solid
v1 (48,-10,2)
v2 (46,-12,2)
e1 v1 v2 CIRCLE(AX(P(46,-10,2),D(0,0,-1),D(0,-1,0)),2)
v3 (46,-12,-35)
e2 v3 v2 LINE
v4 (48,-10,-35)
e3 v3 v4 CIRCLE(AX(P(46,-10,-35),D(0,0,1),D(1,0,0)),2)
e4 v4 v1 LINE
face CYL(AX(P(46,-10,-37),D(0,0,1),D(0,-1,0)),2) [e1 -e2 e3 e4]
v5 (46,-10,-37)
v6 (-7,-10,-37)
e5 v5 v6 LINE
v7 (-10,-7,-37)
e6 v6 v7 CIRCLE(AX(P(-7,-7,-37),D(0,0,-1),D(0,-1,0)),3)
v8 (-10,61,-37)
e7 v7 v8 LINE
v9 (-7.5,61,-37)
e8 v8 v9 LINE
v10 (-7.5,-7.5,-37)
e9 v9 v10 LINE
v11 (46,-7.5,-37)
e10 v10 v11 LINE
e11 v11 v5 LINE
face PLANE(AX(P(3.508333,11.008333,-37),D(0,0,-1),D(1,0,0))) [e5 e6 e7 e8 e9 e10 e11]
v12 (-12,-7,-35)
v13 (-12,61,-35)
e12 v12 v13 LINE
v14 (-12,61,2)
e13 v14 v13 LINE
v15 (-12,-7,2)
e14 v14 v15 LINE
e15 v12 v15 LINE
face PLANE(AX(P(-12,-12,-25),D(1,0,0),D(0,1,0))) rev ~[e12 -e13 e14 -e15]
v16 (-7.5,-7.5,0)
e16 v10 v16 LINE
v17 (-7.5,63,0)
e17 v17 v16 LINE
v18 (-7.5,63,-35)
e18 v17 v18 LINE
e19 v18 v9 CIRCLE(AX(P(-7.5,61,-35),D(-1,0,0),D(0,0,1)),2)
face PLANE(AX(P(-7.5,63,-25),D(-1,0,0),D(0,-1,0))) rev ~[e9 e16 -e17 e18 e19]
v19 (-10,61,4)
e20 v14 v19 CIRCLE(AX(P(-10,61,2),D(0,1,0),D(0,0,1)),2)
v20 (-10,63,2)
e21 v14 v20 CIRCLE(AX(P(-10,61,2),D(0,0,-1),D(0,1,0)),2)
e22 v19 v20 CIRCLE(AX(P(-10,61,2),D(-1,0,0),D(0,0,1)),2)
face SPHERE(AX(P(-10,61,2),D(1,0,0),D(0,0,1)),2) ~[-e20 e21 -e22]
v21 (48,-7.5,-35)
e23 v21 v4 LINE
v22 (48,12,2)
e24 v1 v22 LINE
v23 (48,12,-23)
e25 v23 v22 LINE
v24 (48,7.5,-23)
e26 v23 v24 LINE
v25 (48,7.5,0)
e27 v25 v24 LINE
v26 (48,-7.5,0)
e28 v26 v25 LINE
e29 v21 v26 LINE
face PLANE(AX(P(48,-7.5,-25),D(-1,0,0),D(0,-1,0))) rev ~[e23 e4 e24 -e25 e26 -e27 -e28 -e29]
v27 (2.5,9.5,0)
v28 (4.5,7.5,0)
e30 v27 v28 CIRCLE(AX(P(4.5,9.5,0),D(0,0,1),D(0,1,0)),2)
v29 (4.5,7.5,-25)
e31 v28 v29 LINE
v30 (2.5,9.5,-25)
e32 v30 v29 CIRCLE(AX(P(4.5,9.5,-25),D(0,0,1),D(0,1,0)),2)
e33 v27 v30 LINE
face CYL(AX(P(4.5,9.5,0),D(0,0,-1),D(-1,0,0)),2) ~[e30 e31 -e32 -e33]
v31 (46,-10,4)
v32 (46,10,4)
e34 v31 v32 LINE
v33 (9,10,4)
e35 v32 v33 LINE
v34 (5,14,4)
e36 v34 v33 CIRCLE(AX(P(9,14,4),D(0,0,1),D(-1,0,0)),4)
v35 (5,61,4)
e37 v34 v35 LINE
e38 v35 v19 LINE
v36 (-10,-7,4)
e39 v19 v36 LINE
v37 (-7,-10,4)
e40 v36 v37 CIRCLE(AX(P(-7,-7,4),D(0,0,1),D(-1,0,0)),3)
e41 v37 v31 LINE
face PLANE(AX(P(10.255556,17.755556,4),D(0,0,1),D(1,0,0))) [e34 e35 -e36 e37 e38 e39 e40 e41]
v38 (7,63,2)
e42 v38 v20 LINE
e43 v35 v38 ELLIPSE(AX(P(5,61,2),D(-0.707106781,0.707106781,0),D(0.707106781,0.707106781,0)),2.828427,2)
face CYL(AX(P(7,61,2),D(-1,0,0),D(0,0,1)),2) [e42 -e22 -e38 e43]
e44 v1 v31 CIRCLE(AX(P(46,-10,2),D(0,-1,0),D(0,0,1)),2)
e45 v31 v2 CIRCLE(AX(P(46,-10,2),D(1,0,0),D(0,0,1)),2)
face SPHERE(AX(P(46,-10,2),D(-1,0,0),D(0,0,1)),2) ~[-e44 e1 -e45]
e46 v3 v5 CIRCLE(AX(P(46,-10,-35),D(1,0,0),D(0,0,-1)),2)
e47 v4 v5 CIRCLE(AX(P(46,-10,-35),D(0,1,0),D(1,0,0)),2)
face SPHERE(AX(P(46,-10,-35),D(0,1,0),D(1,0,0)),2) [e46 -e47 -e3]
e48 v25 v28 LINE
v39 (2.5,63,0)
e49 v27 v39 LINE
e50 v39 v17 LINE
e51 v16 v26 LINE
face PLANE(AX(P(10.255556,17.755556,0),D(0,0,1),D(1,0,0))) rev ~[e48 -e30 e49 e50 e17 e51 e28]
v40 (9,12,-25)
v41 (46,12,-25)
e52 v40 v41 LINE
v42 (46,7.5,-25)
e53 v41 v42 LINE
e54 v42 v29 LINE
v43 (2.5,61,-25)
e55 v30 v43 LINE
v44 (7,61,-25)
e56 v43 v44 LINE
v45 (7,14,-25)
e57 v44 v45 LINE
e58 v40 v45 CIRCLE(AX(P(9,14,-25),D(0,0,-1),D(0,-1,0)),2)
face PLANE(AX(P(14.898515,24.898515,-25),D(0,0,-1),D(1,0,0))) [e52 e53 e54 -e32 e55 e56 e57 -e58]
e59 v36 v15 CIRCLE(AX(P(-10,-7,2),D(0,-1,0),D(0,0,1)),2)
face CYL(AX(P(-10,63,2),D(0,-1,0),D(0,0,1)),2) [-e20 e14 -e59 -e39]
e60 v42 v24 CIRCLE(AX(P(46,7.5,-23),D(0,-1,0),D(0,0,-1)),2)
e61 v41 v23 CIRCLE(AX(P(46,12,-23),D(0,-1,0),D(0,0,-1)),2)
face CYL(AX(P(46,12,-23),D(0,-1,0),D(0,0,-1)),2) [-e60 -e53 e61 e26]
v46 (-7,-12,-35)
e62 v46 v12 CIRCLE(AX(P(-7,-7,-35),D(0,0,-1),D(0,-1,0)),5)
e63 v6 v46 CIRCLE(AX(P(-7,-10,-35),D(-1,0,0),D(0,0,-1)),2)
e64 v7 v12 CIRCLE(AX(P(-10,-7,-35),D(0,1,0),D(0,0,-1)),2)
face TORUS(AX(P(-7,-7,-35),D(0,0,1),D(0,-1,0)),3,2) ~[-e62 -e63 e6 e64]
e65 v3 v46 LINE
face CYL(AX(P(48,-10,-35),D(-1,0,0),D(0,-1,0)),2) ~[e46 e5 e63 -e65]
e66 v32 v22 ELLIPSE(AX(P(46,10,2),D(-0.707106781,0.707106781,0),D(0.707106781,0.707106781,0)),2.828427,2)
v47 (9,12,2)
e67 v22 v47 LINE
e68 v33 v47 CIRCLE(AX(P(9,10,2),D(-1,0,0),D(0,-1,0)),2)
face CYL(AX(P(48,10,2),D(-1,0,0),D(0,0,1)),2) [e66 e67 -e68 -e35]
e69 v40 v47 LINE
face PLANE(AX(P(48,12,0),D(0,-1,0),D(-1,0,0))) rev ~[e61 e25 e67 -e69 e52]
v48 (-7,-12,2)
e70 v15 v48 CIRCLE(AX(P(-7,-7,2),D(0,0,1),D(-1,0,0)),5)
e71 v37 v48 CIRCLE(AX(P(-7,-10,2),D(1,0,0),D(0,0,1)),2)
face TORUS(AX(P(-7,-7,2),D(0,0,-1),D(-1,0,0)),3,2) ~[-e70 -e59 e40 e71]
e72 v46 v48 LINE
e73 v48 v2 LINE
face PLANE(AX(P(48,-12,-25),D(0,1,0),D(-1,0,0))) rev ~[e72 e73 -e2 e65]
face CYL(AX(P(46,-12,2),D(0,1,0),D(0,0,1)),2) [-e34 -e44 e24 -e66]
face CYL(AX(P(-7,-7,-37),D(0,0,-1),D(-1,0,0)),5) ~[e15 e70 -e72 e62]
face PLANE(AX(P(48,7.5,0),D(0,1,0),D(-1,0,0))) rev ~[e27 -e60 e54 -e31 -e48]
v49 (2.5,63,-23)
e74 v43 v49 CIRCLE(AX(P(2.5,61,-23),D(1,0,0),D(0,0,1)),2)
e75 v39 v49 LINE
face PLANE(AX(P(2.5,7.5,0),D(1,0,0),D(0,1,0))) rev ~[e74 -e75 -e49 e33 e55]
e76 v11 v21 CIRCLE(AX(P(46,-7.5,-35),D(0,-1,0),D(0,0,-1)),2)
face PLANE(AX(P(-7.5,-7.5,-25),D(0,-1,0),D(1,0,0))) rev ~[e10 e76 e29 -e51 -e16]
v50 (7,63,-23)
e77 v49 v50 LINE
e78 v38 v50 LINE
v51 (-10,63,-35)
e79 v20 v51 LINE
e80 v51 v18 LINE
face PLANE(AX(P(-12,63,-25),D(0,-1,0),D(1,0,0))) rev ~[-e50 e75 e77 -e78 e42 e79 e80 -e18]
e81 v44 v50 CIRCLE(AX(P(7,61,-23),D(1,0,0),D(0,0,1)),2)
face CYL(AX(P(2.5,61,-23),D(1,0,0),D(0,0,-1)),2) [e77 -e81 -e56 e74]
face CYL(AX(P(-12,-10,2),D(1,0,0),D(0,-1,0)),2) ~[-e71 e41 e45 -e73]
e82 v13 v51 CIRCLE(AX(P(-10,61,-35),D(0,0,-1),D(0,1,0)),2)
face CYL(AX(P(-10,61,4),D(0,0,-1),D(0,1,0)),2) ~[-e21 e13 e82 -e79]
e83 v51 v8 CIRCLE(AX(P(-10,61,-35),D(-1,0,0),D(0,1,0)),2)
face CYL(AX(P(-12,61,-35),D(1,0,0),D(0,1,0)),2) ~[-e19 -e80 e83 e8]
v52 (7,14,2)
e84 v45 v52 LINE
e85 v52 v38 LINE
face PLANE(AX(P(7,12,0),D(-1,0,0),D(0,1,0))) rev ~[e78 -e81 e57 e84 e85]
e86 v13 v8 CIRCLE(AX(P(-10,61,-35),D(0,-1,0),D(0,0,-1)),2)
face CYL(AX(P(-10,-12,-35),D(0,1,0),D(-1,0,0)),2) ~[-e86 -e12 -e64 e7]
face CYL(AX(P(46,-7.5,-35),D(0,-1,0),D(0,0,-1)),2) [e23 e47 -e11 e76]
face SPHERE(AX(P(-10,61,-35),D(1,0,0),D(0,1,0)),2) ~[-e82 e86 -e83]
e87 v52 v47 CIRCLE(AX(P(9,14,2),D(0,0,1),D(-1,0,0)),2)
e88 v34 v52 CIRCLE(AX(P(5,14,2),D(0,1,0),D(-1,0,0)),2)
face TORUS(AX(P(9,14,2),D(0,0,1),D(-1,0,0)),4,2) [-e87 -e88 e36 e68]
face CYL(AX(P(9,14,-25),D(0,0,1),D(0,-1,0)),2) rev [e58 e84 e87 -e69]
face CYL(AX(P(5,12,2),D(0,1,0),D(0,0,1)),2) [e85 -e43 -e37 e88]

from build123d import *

# Parameters (mm, degrees)
F1_DEPTH    = 4
F3_DEPTH    = 25
F5_DEPTH    = 12
F6_R        = 2
F7_T1_DEPTH = 41
F7_T4_ANGLE = 90
F7_T6_ANGLE = 90


# Not quite as in the source:
# - a fillet or chamfer that OpenCascade refuses, or shapes differently, is made with other operations: its cross-section is extruded or revolved along the edge and cut away or added


with BuildPart() as f1:
    # F0 (on Top) → F1 (new body)
    with BuildSketch(Plane.XY):
        Polygon((7, 12), (7, 63), (-12, 63), (-12, -12), (48, -12), (48, 12), align=None)
    extrude(amount=F1_DEPTH)

    # F2 (on face) → F3 (join)
    with BuildSketch(Plane(origin=(0, 0, 0), x_dir=(1, 0, 0), z_dir=(0, 0, -1))):
        Polygon((48, 12), (-12, 12), (-12, -63), (-7.5, -63), (-7.5, 7.5), (48, 7.5), align=None)
        Polygon((2.5, -63), (7, -63), (7, -12), (48, -12), (48, -7.5), (2.5, -7.5), align=None)
    extrude(amount=F3_DEPTH)

    # F4 (on face) → F5 (join)
    with BuildSketch(Plane(origin=(0, 0, -25), x_dir=(1, 0, 0), z_dir=(0, 0, -1))):
        Polygon((48, 12), (-12, 12), (-12, -63), (-7.5, -63), (-7.5, 7.5), (48, 7.5), align=None)
    extrude(amount=F5_DEPTH)

    # F6
    f6_edges = [f1.edges().sort_by_distance(p)[0] for p in [
        (7, 37.5, 4),
        (-2.5, 63, 4),
        (-12, 25.5, 4),
        (18, -12, 4),
        (48, 0, 4),
        (27.5, 12, 4),
        (-9.75, 63, -37),
        (4.75, 63, -25),
        (48, -9.75, -37),
        (48, 9.75, -25),
        (2.5, 7.5, -12.5),
        (7, 12, -10.5),
        (-12, 63, -16.5),
        (48, -12, -16.5),
        (-12, 25.5, -37),
        (18, -12, -37),
    ]]
    fillet(f6_edges, radius=F6_R)

    # F7: fillet of radius 5 on 1 edges, made by hand

    # F7_s2 → F7_t1 (cut)
    with BuildSketch(Plane.XY.offset(-37)):
        with BuildLine():
            ThreePointArc((-12, -7), (-10.5355339059, -10.5355339059), (-7, -12))
            Line((-7, -12), (-12, -12))
            Line((-12, -12), (-12, -7))
        make_face()
    extrude(amount=F7_T1_DEPTH, mode=Mode.SUBTRACT)

    # F7_s3 → F7_t4 (revolve, cut)
    with BuildSketch(Plane.YZ.offset(-7)):
        with BuildLine():
            ThreePointArc((-10, -37), (-11.4142135624, -36.4142135624), (-12, -35))
            Line((-12, -35), (-12, -37))
            Line((-12, -37), (-10, -37))
        make_face()
    revolve(axis=Axis((-7, -7, -37), (0, 0, -1)), revolution_arc=F7_T4_ANGLE, mode=Mode.SUBTRACT)

    # F7_s5 → F7_t6 (revolve, cut)
    with BuildSketch(Plane.XZ.offset(7)):
        with BuildLine():
            ThreePointArc((-10, 4), (-11.4142135624, 3.4142135624), (-12, 2))
            Line((-12, 2), (-12, 4))
            Line((-12, 4), (-10, 4))
        make_face()
    revolve(axis=Axis((-7, -7, 4), (0, 0, 1)), revolution_arc=F7_T6_ANGLE, mode=Mode.SUBTRACT)


solid = f1.part
